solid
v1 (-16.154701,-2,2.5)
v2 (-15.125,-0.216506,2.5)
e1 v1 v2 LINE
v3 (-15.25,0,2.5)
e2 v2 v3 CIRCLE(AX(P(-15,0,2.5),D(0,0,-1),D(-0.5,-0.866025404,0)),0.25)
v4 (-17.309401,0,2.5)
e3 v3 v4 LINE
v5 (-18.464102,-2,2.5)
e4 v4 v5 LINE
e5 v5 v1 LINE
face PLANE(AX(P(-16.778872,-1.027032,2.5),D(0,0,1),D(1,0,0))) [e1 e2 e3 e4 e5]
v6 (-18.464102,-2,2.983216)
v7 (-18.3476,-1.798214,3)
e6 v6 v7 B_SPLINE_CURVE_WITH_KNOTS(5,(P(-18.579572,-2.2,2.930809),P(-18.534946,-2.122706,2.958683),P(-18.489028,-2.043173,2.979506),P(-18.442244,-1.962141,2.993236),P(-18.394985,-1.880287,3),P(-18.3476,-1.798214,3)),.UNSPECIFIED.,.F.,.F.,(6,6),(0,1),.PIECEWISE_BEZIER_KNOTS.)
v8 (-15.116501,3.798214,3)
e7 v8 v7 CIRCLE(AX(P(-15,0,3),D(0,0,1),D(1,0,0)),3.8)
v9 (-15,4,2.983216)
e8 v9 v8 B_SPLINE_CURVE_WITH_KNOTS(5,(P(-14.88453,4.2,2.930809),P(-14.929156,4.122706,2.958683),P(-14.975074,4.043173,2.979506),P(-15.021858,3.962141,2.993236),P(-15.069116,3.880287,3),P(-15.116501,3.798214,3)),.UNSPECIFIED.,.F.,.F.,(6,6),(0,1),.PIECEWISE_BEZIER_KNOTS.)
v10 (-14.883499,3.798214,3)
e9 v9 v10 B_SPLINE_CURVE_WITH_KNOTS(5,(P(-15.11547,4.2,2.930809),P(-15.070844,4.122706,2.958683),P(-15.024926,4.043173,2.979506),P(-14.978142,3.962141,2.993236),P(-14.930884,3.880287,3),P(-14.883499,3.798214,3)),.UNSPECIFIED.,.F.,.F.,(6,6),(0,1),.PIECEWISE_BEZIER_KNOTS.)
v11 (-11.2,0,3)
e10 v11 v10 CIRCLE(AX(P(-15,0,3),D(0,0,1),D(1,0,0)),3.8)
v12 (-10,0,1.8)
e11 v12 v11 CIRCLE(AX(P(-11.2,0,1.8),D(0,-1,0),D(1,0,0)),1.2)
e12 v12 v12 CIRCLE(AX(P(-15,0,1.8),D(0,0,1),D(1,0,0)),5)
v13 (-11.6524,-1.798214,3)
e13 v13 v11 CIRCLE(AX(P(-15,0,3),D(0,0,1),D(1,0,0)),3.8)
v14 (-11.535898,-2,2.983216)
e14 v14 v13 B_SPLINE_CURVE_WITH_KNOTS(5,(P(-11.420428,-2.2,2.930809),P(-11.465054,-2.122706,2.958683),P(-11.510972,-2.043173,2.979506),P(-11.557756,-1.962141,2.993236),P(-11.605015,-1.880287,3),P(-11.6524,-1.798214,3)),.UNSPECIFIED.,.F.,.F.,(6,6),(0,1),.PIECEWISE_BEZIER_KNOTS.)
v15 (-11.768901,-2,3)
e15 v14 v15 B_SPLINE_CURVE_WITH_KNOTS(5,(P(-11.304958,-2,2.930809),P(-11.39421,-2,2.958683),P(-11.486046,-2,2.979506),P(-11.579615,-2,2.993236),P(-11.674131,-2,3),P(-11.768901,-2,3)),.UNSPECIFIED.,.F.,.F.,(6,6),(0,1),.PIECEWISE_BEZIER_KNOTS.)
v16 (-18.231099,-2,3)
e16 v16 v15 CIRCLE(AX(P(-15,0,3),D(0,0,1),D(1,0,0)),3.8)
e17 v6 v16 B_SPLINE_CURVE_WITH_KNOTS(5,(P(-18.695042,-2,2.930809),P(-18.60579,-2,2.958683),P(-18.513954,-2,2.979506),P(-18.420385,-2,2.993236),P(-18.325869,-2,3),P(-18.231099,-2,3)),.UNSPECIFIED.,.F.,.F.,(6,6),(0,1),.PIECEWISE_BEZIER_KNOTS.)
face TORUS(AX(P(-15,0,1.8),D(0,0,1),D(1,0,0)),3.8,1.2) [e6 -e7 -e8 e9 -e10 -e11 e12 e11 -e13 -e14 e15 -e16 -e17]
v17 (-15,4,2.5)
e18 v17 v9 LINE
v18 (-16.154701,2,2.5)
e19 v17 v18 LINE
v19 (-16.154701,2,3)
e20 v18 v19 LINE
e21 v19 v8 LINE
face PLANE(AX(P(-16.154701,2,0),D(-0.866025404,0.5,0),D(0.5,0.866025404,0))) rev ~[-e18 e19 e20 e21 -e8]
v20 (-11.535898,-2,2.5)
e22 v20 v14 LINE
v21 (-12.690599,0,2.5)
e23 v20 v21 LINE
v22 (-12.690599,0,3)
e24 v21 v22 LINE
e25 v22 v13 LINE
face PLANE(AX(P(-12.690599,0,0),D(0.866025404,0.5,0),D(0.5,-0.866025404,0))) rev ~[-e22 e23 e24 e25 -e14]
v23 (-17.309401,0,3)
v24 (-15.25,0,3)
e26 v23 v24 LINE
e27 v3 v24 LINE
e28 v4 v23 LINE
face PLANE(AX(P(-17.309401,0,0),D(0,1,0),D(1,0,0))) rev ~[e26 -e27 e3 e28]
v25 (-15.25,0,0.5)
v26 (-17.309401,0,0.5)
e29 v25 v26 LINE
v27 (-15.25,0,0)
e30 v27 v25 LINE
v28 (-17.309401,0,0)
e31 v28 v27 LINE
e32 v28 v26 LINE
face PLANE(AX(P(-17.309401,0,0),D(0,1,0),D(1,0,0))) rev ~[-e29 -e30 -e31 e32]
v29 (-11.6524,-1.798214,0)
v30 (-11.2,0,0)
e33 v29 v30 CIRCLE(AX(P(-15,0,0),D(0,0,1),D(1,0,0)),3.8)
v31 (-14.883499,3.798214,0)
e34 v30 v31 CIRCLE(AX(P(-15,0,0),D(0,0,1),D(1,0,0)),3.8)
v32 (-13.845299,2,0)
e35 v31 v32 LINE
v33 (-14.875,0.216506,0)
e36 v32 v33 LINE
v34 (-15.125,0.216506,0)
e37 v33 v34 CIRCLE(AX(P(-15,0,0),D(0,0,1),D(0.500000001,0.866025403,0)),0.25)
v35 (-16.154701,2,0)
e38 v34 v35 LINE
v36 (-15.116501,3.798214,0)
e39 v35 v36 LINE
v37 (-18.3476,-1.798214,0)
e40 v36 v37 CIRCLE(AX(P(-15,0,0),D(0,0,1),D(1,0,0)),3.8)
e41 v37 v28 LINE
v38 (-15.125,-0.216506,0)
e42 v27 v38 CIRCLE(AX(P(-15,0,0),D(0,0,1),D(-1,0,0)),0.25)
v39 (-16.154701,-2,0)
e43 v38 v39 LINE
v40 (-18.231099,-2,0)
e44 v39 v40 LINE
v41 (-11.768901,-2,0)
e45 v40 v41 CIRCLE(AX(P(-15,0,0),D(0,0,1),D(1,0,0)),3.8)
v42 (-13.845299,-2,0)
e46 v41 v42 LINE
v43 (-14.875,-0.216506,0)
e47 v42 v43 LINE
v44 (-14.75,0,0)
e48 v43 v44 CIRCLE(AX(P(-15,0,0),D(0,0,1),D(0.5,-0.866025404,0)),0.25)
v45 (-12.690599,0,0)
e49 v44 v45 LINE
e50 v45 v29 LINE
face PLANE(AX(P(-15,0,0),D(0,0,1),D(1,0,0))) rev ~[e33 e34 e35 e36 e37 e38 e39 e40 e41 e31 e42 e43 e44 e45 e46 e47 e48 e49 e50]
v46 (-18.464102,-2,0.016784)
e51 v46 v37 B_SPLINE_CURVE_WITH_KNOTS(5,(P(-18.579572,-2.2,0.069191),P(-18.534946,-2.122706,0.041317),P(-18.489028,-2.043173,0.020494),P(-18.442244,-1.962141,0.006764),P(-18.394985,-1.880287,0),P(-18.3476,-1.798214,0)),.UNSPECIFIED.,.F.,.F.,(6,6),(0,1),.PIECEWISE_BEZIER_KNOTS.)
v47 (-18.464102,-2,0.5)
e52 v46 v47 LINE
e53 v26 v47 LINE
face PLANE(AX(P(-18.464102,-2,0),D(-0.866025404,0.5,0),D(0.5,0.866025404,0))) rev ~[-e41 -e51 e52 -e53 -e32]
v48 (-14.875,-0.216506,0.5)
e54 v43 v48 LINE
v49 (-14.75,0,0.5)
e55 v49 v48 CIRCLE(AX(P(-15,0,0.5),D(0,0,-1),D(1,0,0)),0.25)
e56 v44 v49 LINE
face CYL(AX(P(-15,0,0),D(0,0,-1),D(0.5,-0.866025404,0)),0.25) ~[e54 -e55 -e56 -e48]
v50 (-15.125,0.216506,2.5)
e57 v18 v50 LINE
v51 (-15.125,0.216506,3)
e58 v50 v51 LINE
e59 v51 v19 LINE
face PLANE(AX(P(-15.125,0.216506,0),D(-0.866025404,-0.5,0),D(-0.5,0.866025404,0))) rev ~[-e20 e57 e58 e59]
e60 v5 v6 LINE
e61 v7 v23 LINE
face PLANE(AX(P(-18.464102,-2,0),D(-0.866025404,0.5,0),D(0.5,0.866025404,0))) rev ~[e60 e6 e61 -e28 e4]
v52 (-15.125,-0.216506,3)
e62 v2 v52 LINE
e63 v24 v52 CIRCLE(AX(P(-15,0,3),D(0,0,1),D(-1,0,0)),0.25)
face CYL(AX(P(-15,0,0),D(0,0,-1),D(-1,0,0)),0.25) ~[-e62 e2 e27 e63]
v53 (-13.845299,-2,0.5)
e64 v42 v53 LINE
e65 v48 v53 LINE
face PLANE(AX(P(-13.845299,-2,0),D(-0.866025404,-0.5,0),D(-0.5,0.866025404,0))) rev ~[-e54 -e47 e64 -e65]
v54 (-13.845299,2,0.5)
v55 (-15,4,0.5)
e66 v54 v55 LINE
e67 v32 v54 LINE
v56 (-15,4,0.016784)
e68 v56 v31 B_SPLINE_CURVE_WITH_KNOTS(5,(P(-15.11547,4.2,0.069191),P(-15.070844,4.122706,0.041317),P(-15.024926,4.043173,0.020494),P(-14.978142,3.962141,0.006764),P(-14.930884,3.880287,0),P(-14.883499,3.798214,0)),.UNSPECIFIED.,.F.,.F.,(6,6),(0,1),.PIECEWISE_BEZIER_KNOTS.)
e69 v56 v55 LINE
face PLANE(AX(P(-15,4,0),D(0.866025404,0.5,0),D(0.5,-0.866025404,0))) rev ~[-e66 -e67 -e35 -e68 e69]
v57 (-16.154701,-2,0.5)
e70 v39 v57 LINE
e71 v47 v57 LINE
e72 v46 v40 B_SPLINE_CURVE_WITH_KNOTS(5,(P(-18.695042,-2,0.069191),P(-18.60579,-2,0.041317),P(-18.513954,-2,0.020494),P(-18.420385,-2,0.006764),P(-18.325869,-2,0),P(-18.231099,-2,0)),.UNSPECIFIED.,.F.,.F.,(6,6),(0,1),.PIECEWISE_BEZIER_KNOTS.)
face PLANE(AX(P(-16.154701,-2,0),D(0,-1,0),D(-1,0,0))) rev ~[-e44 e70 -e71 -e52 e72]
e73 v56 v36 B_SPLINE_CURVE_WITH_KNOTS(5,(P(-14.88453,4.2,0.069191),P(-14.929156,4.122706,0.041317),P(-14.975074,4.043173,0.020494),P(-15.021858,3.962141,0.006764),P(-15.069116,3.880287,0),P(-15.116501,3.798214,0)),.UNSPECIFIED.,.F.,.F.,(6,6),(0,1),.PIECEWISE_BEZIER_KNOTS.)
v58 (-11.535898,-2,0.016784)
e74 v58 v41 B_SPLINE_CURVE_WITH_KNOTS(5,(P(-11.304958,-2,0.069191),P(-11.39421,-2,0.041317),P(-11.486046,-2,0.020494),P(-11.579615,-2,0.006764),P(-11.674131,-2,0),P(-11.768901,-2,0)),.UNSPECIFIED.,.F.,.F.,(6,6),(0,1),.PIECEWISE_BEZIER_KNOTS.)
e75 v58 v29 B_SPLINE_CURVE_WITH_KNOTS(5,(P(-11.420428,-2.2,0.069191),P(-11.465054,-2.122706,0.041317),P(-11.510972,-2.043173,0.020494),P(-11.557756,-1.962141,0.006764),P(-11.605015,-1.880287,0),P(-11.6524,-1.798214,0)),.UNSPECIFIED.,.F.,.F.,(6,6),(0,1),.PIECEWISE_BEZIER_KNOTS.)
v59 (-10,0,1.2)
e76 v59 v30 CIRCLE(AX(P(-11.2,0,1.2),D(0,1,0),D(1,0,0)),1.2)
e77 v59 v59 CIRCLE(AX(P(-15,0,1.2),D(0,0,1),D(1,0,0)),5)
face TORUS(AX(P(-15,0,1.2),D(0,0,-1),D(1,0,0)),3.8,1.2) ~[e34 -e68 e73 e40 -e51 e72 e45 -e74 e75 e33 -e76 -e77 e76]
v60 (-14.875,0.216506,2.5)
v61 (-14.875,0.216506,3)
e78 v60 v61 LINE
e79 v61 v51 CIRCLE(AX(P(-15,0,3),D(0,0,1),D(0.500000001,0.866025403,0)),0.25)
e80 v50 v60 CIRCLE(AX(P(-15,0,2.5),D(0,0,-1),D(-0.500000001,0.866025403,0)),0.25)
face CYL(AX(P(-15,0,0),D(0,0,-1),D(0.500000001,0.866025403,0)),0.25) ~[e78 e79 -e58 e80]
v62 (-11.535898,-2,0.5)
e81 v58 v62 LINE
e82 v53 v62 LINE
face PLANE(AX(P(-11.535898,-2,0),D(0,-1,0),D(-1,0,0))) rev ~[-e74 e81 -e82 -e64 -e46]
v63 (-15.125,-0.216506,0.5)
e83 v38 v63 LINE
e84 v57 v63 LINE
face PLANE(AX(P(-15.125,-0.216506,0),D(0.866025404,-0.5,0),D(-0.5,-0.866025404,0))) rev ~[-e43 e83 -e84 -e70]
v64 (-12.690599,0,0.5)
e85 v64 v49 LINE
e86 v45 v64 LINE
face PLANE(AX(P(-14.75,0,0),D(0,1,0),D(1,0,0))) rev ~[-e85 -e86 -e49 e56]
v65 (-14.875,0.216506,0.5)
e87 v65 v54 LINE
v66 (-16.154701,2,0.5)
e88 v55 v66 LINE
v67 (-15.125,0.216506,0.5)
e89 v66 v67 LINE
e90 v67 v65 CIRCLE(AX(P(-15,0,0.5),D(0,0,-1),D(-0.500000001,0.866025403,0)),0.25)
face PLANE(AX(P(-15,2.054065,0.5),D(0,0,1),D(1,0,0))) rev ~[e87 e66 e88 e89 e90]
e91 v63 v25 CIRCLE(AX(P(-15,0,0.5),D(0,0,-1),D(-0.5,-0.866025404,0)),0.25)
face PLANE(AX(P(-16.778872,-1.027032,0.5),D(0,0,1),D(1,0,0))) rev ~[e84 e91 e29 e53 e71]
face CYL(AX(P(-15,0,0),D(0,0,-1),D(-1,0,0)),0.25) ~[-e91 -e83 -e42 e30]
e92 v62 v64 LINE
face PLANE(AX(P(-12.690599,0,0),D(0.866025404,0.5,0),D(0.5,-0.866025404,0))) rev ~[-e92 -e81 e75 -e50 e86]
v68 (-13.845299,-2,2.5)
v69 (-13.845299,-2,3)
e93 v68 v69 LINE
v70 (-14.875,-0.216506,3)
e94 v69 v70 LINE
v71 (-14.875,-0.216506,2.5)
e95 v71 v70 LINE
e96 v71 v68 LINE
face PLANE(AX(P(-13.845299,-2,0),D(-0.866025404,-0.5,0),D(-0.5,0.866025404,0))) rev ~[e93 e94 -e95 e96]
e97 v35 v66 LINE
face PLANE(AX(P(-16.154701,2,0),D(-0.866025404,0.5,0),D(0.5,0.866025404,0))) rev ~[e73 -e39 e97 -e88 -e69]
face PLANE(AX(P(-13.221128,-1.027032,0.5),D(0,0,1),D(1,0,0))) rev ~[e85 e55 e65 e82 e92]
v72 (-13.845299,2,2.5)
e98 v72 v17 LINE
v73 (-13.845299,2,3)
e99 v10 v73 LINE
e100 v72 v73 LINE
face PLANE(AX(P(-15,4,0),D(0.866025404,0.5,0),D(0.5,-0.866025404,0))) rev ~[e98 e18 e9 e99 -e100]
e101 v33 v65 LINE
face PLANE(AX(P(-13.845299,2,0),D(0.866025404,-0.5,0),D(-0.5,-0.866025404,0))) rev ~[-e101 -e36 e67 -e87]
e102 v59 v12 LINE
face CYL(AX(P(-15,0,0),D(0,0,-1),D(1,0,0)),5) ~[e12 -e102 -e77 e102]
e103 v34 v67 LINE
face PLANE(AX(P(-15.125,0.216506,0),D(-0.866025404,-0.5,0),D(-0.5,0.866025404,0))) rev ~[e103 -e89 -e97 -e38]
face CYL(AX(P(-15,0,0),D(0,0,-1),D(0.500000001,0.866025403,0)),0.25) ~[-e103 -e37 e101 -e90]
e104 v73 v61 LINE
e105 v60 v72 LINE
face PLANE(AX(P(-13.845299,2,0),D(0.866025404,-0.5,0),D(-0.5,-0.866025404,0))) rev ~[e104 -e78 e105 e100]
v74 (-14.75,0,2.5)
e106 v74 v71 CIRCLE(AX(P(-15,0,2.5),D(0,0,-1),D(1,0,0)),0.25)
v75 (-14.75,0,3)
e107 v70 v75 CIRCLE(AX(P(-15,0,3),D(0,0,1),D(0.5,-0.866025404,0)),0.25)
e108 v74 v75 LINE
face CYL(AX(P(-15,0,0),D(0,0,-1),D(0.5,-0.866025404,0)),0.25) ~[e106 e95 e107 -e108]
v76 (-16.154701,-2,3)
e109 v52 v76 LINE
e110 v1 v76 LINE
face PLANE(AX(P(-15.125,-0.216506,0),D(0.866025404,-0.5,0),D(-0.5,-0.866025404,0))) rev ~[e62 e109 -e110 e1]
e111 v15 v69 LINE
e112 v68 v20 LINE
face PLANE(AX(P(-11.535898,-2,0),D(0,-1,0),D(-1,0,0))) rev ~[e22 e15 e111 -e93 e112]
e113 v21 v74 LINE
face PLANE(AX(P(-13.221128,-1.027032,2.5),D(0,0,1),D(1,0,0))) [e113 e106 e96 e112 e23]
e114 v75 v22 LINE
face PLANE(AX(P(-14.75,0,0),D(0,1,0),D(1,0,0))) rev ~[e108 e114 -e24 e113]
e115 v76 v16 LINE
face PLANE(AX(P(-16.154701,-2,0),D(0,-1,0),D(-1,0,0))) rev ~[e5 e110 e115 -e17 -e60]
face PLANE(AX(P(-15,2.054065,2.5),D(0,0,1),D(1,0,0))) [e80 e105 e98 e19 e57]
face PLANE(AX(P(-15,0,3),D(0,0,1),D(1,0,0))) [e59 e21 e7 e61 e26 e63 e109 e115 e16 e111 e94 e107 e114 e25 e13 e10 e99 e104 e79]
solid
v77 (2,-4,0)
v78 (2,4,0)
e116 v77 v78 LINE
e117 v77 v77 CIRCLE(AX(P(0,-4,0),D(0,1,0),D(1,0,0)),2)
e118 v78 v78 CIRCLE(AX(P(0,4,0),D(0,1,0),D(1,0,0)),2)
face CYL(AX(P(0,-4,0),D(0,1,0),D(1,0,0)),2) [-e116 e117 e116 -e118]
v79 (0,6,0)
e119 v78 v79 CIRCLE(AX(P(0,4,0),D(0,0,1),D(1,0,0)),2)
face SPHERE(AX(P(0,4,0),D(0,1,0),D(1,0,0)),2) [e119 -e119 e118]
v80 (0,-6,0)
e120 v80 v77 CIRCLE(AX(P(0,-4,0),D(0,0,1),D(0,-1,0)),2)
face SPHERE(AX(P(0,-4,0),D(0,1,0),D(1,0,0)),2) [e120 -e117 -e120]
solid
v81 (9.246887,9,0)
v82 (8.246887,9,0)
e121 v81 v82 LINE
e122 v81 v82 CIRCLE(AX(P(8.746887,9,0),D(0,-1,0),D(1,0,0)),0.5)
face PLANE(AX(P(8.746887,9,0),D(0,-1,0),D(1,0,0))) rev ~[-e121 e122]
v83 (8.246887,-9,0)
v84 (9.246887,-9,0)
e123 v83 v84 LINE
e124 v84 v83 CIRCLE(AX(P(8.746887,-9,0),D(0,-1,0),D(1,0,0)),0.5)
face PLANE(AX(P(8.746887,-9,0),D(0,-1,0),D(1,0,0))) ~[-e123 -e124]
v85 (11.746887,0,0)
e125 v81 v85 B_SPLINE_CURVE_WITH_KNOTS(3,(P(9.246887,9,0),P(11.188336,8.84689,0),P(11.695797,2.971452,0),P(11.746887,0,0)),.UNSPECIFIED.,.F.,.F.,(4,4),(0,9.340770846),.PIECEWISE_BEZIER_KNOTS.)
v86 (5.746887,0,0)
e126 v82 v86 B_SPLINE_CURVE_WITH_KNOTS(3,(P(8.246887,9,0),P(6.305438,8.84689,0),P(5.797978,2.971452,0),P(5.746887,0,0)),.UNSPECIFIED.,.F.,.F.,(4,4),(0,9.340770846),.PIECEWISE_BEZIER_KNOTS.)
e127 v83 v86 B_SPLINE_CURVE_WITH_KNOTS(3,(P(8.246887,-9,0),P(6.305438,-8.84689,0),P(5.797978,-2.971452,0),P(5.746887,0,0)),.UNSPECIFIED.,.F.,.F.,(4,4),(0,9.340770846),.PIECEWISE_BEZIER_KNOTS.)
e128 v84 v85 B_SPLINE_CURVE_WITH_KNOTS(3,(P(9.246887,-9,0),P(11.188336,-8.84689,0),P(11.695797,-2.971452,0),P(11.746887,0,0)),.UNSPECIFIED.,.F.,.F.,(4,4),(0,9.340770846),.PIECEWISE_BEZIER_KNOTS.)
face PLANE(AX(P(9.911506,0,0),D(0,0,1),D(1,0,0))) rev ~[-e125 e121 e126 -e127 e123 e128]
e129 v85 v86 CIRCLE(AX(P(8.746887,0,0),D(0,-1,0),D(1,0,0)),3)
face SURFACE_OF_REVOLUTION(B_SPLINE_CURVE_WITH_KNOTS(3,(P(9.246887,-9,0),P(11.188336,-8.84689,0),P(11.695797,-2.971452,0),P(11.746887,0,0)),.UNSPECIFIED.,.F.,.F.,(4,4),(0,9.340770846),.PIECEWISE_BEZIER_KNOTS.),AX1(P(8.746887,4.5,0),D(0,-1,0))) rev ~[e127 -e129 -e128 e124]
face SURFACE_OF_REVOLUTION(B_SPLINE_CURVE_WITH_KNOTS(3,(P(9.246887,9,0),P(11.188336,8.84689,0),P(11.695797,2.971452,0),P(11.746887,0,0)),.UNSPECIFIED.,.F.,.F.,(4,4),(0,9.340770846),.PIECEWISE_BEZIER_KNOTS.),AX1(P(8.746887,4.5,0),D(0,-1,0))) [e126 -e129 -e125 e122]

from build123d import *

# Parameters (mm, degrees)
F2_R     = 5
F3_DEPTH = 3
F4_START = 0.5
F4_DEPTH = 2
F7_ANGLE = 180


# Not quite as in the source:
# - a fillet or chamfer that OpenCascade refuses, or shapes differently, is made with other operations: its cross-section is extruded or revolved along the edge and cut away or added


with BuildPart() as f1:
    # F0 (on Top) → F1 (revolve)
    with BuildSketch(Plane.XY):
        with BuildLine():
            Line((0, 6), (0, 0))
            Line((0, 0), (0, -6))
            ThreePointArc((0, -6), (1.4142135624, -5.4142135624), (2, -4))
            Line((2, -4), (2, 4))
            ThreePointArc((2, 4), (1.4142135624, 5.4142135624), (0, 6))
        make_face()
    revolve(axis=Axis((0, 3, 0), (0, 1, 0)))


with BuildPart() as f3:
    # F2 (on Top) → F3 (new body)
    with BuildSketch(Plane.XY):
        with Locations((-15, 0)):
            Circle(F2_R)
        with BuildLine():
            Line((-16.1547005384, 2), (-15, 4))
            Line((-15, 4), (-13.8452994616, 2))
            Line((-13.8452994616, 2), (-14.875, 0.2165063509))
            ThreePointArc((-14.875, 0.2165063509), (-14.7834936491, 0.125), (-14.75, 0))
            Line((-14.75, 0), (-12.6905989232, 0))
            Line((-12.6905989232, 0), (-11.5358983849, -2))
            Line((-11.5358983849, -2), (-13.8452994616, -2))
            Line((-13.8452994616, -2), (-14.875, -0.2165063509))
            ThreePointArc((-14.875, -0.2165063509), (-15, -0.25), (-15.125, -0.2165063509))
            Line((-15.125, -0.2165063509), (-16.1547005384, -2))
            Line((-16.1547005384, -2), (-18.4641016151, -2))
            Line((-18.4641016151, -2), (-17.3094010768, 0))
            Line((-17.3094010768, 0), (-15.25, 0))
            ThreePointArc((-15.25, 0), (-15.2165063509, 0.125), (-15.125, 0.2165063509))
            Line((-15.125, 0.2165063509), (-16.1547005384, 2))
        make_face(mode=Mode.SUBTRACT)
        with BuildLine():
            ThreePointArc((-14.875, 0.2165063509), (-15, 0.25), (-15.125, 0.2165063509))
            ThreePointArc((-15.125, 0.2165063509), (-15.2165063509, 0.125), (-15.25, 0))
            ThreePointArc((-15.25, 0), (-15.2165063509, -0.125), (-15.125, -0.2165063509))
            ThreePointArc((-15.125, -0.2165063509), (-15, -0.25), (-14.875, -0.2165063509))
            ThreePointArc((-14.875, -0.2165063509), (-14.7834936491, -0.125), (-14.75, 0))
            ThreePointArc((-14.75, 0), (-14.7834936491, 0.125), (-14.875, 0.2165063509))
        make_face()
    extrude(amount=F3_DEPTH)

    # F2 (on Top) → F4 (join)
    with BuildSketch(Plane.XY.offset(F4_START)):
        with BuildLine():
            ThreePointArc((-15.125, -0.2165063509), (-15.2165063509, -0.125), (-15.25, 0))
            Line((-15.25, 0), (-17.3094010768, 0))
            Line((-17.3094010768, 0), (-18.4641016151, -2))
            Line((-18.4641016151, -2), (-16.1547005384, -2))
            Line((-16.1547005384, -2), (-15.125, -0.2165063509))
        make_face()
        with BuildLine():
            Line((-12.6905989232, 0), (-14.75, 0))
            ThreePointArc((-14.75, 0), (-14.7834936491, -0.125), (-14.875, -0.2165063509))
            Line((-14.875, -0.2165063509), (-13.8452994616, -2))
            Line((-13.8452994616, -2), (-11.5358983849, -2))
            Line((-11.5358983849, -2), (-12.6905989232, 0))
        make_face()
        with BuildLine():
            Line((-13.8452994616, 2), (-15, 4))
            Line((-15, 4), (-16.1547005384, 2))
            Line((-16.1547005384, 2), (-15.125, 0.2165063509))
            ThreePointArc((-15.125, 0.2165063509), (-15, 0.25), (-14.875, 0.2165063509))
            Line((-14.875, 0.2165063509), (-13.8452994616, 2))
        make_face()
    extrude(amount=F4_DEPTH)

    # F5: fillet of radius 1.2 on 3 edges, made by hand

    # F5_s1 → F5_t2 (revolve, cut)
    with BuildSketch(Plane.XZ):
        with BuildLine():
            ThreePointArc((-10, 1.2), (-10.3514718626, 0.3514718626), (-11.2, 0))
            Line((-11.2, 0), (-10, 0))
            Line((-10, 0), (-10, 1.2))
        make_face()
    revolve(axis=Axis((-15, 0, 0), (0, 0, 1)), mode=Mode.SUBTRACT)

    # F5_s3 → F5_t4 (revolve, cut)
    with BuildSketch(Plane.XZ):
        with BuildLine():
            ThreePointArc((-10, 1.8), (-10.3514718626, 2.6485281374), (-11.2, 3))
            Line((-11.2, 3), (-10, 3))
            Line((-10, 3), (-10, 1.8))
        make_face()
    revolve(axis=Axis((-15, 0, 3), (0, 0, 1)), mode=Mode.SUBTRACT)


with BuildPart() as f7:
    # F6 (on Top) → F7 (revolve)
    with BuildSketch(Plane.XY):
        with BuildLine():
            Line((8.7468870582, 9), (8.7468870582, 0))
            Line((8.7468870582, 0), (8.7468870582, -9))
            Line((8.7468870582, -9), (9.2468870582, -9))
            add(Edge.make_bspline(
                [(9.2468870582, -9), (11.1883362318, -8.8468901743), (11.6957966082, -2.9714520147), (11.7468870582, 0)],
                knots=[0, 0, 0, 0, 9.3407708461, 9.3407708461, 9.3407708461, 9.3407708461], degree=3))
            add(Edge.make_bspline(
                [(9.2468870582, 9), (11.1883362318, 8.8468901743), (11.6957966082, 2.9714520147), (11.7468870582, 0)],
                knots=[0, 0, 0, 0, 9.3407708461, 9.3407708461, 9.3407708461, 9.3407708461], degree=3))
            Line((9.2468870582, 9), (8.7468870582, 9))
        make_face()
    revolve(axis=Axis((8.7468870582, 4.5, 0), (0, -1, 0)), revolution_arc=F7_ANGLE)


solid = Compound([f1.part, f3.part, f7.part])
